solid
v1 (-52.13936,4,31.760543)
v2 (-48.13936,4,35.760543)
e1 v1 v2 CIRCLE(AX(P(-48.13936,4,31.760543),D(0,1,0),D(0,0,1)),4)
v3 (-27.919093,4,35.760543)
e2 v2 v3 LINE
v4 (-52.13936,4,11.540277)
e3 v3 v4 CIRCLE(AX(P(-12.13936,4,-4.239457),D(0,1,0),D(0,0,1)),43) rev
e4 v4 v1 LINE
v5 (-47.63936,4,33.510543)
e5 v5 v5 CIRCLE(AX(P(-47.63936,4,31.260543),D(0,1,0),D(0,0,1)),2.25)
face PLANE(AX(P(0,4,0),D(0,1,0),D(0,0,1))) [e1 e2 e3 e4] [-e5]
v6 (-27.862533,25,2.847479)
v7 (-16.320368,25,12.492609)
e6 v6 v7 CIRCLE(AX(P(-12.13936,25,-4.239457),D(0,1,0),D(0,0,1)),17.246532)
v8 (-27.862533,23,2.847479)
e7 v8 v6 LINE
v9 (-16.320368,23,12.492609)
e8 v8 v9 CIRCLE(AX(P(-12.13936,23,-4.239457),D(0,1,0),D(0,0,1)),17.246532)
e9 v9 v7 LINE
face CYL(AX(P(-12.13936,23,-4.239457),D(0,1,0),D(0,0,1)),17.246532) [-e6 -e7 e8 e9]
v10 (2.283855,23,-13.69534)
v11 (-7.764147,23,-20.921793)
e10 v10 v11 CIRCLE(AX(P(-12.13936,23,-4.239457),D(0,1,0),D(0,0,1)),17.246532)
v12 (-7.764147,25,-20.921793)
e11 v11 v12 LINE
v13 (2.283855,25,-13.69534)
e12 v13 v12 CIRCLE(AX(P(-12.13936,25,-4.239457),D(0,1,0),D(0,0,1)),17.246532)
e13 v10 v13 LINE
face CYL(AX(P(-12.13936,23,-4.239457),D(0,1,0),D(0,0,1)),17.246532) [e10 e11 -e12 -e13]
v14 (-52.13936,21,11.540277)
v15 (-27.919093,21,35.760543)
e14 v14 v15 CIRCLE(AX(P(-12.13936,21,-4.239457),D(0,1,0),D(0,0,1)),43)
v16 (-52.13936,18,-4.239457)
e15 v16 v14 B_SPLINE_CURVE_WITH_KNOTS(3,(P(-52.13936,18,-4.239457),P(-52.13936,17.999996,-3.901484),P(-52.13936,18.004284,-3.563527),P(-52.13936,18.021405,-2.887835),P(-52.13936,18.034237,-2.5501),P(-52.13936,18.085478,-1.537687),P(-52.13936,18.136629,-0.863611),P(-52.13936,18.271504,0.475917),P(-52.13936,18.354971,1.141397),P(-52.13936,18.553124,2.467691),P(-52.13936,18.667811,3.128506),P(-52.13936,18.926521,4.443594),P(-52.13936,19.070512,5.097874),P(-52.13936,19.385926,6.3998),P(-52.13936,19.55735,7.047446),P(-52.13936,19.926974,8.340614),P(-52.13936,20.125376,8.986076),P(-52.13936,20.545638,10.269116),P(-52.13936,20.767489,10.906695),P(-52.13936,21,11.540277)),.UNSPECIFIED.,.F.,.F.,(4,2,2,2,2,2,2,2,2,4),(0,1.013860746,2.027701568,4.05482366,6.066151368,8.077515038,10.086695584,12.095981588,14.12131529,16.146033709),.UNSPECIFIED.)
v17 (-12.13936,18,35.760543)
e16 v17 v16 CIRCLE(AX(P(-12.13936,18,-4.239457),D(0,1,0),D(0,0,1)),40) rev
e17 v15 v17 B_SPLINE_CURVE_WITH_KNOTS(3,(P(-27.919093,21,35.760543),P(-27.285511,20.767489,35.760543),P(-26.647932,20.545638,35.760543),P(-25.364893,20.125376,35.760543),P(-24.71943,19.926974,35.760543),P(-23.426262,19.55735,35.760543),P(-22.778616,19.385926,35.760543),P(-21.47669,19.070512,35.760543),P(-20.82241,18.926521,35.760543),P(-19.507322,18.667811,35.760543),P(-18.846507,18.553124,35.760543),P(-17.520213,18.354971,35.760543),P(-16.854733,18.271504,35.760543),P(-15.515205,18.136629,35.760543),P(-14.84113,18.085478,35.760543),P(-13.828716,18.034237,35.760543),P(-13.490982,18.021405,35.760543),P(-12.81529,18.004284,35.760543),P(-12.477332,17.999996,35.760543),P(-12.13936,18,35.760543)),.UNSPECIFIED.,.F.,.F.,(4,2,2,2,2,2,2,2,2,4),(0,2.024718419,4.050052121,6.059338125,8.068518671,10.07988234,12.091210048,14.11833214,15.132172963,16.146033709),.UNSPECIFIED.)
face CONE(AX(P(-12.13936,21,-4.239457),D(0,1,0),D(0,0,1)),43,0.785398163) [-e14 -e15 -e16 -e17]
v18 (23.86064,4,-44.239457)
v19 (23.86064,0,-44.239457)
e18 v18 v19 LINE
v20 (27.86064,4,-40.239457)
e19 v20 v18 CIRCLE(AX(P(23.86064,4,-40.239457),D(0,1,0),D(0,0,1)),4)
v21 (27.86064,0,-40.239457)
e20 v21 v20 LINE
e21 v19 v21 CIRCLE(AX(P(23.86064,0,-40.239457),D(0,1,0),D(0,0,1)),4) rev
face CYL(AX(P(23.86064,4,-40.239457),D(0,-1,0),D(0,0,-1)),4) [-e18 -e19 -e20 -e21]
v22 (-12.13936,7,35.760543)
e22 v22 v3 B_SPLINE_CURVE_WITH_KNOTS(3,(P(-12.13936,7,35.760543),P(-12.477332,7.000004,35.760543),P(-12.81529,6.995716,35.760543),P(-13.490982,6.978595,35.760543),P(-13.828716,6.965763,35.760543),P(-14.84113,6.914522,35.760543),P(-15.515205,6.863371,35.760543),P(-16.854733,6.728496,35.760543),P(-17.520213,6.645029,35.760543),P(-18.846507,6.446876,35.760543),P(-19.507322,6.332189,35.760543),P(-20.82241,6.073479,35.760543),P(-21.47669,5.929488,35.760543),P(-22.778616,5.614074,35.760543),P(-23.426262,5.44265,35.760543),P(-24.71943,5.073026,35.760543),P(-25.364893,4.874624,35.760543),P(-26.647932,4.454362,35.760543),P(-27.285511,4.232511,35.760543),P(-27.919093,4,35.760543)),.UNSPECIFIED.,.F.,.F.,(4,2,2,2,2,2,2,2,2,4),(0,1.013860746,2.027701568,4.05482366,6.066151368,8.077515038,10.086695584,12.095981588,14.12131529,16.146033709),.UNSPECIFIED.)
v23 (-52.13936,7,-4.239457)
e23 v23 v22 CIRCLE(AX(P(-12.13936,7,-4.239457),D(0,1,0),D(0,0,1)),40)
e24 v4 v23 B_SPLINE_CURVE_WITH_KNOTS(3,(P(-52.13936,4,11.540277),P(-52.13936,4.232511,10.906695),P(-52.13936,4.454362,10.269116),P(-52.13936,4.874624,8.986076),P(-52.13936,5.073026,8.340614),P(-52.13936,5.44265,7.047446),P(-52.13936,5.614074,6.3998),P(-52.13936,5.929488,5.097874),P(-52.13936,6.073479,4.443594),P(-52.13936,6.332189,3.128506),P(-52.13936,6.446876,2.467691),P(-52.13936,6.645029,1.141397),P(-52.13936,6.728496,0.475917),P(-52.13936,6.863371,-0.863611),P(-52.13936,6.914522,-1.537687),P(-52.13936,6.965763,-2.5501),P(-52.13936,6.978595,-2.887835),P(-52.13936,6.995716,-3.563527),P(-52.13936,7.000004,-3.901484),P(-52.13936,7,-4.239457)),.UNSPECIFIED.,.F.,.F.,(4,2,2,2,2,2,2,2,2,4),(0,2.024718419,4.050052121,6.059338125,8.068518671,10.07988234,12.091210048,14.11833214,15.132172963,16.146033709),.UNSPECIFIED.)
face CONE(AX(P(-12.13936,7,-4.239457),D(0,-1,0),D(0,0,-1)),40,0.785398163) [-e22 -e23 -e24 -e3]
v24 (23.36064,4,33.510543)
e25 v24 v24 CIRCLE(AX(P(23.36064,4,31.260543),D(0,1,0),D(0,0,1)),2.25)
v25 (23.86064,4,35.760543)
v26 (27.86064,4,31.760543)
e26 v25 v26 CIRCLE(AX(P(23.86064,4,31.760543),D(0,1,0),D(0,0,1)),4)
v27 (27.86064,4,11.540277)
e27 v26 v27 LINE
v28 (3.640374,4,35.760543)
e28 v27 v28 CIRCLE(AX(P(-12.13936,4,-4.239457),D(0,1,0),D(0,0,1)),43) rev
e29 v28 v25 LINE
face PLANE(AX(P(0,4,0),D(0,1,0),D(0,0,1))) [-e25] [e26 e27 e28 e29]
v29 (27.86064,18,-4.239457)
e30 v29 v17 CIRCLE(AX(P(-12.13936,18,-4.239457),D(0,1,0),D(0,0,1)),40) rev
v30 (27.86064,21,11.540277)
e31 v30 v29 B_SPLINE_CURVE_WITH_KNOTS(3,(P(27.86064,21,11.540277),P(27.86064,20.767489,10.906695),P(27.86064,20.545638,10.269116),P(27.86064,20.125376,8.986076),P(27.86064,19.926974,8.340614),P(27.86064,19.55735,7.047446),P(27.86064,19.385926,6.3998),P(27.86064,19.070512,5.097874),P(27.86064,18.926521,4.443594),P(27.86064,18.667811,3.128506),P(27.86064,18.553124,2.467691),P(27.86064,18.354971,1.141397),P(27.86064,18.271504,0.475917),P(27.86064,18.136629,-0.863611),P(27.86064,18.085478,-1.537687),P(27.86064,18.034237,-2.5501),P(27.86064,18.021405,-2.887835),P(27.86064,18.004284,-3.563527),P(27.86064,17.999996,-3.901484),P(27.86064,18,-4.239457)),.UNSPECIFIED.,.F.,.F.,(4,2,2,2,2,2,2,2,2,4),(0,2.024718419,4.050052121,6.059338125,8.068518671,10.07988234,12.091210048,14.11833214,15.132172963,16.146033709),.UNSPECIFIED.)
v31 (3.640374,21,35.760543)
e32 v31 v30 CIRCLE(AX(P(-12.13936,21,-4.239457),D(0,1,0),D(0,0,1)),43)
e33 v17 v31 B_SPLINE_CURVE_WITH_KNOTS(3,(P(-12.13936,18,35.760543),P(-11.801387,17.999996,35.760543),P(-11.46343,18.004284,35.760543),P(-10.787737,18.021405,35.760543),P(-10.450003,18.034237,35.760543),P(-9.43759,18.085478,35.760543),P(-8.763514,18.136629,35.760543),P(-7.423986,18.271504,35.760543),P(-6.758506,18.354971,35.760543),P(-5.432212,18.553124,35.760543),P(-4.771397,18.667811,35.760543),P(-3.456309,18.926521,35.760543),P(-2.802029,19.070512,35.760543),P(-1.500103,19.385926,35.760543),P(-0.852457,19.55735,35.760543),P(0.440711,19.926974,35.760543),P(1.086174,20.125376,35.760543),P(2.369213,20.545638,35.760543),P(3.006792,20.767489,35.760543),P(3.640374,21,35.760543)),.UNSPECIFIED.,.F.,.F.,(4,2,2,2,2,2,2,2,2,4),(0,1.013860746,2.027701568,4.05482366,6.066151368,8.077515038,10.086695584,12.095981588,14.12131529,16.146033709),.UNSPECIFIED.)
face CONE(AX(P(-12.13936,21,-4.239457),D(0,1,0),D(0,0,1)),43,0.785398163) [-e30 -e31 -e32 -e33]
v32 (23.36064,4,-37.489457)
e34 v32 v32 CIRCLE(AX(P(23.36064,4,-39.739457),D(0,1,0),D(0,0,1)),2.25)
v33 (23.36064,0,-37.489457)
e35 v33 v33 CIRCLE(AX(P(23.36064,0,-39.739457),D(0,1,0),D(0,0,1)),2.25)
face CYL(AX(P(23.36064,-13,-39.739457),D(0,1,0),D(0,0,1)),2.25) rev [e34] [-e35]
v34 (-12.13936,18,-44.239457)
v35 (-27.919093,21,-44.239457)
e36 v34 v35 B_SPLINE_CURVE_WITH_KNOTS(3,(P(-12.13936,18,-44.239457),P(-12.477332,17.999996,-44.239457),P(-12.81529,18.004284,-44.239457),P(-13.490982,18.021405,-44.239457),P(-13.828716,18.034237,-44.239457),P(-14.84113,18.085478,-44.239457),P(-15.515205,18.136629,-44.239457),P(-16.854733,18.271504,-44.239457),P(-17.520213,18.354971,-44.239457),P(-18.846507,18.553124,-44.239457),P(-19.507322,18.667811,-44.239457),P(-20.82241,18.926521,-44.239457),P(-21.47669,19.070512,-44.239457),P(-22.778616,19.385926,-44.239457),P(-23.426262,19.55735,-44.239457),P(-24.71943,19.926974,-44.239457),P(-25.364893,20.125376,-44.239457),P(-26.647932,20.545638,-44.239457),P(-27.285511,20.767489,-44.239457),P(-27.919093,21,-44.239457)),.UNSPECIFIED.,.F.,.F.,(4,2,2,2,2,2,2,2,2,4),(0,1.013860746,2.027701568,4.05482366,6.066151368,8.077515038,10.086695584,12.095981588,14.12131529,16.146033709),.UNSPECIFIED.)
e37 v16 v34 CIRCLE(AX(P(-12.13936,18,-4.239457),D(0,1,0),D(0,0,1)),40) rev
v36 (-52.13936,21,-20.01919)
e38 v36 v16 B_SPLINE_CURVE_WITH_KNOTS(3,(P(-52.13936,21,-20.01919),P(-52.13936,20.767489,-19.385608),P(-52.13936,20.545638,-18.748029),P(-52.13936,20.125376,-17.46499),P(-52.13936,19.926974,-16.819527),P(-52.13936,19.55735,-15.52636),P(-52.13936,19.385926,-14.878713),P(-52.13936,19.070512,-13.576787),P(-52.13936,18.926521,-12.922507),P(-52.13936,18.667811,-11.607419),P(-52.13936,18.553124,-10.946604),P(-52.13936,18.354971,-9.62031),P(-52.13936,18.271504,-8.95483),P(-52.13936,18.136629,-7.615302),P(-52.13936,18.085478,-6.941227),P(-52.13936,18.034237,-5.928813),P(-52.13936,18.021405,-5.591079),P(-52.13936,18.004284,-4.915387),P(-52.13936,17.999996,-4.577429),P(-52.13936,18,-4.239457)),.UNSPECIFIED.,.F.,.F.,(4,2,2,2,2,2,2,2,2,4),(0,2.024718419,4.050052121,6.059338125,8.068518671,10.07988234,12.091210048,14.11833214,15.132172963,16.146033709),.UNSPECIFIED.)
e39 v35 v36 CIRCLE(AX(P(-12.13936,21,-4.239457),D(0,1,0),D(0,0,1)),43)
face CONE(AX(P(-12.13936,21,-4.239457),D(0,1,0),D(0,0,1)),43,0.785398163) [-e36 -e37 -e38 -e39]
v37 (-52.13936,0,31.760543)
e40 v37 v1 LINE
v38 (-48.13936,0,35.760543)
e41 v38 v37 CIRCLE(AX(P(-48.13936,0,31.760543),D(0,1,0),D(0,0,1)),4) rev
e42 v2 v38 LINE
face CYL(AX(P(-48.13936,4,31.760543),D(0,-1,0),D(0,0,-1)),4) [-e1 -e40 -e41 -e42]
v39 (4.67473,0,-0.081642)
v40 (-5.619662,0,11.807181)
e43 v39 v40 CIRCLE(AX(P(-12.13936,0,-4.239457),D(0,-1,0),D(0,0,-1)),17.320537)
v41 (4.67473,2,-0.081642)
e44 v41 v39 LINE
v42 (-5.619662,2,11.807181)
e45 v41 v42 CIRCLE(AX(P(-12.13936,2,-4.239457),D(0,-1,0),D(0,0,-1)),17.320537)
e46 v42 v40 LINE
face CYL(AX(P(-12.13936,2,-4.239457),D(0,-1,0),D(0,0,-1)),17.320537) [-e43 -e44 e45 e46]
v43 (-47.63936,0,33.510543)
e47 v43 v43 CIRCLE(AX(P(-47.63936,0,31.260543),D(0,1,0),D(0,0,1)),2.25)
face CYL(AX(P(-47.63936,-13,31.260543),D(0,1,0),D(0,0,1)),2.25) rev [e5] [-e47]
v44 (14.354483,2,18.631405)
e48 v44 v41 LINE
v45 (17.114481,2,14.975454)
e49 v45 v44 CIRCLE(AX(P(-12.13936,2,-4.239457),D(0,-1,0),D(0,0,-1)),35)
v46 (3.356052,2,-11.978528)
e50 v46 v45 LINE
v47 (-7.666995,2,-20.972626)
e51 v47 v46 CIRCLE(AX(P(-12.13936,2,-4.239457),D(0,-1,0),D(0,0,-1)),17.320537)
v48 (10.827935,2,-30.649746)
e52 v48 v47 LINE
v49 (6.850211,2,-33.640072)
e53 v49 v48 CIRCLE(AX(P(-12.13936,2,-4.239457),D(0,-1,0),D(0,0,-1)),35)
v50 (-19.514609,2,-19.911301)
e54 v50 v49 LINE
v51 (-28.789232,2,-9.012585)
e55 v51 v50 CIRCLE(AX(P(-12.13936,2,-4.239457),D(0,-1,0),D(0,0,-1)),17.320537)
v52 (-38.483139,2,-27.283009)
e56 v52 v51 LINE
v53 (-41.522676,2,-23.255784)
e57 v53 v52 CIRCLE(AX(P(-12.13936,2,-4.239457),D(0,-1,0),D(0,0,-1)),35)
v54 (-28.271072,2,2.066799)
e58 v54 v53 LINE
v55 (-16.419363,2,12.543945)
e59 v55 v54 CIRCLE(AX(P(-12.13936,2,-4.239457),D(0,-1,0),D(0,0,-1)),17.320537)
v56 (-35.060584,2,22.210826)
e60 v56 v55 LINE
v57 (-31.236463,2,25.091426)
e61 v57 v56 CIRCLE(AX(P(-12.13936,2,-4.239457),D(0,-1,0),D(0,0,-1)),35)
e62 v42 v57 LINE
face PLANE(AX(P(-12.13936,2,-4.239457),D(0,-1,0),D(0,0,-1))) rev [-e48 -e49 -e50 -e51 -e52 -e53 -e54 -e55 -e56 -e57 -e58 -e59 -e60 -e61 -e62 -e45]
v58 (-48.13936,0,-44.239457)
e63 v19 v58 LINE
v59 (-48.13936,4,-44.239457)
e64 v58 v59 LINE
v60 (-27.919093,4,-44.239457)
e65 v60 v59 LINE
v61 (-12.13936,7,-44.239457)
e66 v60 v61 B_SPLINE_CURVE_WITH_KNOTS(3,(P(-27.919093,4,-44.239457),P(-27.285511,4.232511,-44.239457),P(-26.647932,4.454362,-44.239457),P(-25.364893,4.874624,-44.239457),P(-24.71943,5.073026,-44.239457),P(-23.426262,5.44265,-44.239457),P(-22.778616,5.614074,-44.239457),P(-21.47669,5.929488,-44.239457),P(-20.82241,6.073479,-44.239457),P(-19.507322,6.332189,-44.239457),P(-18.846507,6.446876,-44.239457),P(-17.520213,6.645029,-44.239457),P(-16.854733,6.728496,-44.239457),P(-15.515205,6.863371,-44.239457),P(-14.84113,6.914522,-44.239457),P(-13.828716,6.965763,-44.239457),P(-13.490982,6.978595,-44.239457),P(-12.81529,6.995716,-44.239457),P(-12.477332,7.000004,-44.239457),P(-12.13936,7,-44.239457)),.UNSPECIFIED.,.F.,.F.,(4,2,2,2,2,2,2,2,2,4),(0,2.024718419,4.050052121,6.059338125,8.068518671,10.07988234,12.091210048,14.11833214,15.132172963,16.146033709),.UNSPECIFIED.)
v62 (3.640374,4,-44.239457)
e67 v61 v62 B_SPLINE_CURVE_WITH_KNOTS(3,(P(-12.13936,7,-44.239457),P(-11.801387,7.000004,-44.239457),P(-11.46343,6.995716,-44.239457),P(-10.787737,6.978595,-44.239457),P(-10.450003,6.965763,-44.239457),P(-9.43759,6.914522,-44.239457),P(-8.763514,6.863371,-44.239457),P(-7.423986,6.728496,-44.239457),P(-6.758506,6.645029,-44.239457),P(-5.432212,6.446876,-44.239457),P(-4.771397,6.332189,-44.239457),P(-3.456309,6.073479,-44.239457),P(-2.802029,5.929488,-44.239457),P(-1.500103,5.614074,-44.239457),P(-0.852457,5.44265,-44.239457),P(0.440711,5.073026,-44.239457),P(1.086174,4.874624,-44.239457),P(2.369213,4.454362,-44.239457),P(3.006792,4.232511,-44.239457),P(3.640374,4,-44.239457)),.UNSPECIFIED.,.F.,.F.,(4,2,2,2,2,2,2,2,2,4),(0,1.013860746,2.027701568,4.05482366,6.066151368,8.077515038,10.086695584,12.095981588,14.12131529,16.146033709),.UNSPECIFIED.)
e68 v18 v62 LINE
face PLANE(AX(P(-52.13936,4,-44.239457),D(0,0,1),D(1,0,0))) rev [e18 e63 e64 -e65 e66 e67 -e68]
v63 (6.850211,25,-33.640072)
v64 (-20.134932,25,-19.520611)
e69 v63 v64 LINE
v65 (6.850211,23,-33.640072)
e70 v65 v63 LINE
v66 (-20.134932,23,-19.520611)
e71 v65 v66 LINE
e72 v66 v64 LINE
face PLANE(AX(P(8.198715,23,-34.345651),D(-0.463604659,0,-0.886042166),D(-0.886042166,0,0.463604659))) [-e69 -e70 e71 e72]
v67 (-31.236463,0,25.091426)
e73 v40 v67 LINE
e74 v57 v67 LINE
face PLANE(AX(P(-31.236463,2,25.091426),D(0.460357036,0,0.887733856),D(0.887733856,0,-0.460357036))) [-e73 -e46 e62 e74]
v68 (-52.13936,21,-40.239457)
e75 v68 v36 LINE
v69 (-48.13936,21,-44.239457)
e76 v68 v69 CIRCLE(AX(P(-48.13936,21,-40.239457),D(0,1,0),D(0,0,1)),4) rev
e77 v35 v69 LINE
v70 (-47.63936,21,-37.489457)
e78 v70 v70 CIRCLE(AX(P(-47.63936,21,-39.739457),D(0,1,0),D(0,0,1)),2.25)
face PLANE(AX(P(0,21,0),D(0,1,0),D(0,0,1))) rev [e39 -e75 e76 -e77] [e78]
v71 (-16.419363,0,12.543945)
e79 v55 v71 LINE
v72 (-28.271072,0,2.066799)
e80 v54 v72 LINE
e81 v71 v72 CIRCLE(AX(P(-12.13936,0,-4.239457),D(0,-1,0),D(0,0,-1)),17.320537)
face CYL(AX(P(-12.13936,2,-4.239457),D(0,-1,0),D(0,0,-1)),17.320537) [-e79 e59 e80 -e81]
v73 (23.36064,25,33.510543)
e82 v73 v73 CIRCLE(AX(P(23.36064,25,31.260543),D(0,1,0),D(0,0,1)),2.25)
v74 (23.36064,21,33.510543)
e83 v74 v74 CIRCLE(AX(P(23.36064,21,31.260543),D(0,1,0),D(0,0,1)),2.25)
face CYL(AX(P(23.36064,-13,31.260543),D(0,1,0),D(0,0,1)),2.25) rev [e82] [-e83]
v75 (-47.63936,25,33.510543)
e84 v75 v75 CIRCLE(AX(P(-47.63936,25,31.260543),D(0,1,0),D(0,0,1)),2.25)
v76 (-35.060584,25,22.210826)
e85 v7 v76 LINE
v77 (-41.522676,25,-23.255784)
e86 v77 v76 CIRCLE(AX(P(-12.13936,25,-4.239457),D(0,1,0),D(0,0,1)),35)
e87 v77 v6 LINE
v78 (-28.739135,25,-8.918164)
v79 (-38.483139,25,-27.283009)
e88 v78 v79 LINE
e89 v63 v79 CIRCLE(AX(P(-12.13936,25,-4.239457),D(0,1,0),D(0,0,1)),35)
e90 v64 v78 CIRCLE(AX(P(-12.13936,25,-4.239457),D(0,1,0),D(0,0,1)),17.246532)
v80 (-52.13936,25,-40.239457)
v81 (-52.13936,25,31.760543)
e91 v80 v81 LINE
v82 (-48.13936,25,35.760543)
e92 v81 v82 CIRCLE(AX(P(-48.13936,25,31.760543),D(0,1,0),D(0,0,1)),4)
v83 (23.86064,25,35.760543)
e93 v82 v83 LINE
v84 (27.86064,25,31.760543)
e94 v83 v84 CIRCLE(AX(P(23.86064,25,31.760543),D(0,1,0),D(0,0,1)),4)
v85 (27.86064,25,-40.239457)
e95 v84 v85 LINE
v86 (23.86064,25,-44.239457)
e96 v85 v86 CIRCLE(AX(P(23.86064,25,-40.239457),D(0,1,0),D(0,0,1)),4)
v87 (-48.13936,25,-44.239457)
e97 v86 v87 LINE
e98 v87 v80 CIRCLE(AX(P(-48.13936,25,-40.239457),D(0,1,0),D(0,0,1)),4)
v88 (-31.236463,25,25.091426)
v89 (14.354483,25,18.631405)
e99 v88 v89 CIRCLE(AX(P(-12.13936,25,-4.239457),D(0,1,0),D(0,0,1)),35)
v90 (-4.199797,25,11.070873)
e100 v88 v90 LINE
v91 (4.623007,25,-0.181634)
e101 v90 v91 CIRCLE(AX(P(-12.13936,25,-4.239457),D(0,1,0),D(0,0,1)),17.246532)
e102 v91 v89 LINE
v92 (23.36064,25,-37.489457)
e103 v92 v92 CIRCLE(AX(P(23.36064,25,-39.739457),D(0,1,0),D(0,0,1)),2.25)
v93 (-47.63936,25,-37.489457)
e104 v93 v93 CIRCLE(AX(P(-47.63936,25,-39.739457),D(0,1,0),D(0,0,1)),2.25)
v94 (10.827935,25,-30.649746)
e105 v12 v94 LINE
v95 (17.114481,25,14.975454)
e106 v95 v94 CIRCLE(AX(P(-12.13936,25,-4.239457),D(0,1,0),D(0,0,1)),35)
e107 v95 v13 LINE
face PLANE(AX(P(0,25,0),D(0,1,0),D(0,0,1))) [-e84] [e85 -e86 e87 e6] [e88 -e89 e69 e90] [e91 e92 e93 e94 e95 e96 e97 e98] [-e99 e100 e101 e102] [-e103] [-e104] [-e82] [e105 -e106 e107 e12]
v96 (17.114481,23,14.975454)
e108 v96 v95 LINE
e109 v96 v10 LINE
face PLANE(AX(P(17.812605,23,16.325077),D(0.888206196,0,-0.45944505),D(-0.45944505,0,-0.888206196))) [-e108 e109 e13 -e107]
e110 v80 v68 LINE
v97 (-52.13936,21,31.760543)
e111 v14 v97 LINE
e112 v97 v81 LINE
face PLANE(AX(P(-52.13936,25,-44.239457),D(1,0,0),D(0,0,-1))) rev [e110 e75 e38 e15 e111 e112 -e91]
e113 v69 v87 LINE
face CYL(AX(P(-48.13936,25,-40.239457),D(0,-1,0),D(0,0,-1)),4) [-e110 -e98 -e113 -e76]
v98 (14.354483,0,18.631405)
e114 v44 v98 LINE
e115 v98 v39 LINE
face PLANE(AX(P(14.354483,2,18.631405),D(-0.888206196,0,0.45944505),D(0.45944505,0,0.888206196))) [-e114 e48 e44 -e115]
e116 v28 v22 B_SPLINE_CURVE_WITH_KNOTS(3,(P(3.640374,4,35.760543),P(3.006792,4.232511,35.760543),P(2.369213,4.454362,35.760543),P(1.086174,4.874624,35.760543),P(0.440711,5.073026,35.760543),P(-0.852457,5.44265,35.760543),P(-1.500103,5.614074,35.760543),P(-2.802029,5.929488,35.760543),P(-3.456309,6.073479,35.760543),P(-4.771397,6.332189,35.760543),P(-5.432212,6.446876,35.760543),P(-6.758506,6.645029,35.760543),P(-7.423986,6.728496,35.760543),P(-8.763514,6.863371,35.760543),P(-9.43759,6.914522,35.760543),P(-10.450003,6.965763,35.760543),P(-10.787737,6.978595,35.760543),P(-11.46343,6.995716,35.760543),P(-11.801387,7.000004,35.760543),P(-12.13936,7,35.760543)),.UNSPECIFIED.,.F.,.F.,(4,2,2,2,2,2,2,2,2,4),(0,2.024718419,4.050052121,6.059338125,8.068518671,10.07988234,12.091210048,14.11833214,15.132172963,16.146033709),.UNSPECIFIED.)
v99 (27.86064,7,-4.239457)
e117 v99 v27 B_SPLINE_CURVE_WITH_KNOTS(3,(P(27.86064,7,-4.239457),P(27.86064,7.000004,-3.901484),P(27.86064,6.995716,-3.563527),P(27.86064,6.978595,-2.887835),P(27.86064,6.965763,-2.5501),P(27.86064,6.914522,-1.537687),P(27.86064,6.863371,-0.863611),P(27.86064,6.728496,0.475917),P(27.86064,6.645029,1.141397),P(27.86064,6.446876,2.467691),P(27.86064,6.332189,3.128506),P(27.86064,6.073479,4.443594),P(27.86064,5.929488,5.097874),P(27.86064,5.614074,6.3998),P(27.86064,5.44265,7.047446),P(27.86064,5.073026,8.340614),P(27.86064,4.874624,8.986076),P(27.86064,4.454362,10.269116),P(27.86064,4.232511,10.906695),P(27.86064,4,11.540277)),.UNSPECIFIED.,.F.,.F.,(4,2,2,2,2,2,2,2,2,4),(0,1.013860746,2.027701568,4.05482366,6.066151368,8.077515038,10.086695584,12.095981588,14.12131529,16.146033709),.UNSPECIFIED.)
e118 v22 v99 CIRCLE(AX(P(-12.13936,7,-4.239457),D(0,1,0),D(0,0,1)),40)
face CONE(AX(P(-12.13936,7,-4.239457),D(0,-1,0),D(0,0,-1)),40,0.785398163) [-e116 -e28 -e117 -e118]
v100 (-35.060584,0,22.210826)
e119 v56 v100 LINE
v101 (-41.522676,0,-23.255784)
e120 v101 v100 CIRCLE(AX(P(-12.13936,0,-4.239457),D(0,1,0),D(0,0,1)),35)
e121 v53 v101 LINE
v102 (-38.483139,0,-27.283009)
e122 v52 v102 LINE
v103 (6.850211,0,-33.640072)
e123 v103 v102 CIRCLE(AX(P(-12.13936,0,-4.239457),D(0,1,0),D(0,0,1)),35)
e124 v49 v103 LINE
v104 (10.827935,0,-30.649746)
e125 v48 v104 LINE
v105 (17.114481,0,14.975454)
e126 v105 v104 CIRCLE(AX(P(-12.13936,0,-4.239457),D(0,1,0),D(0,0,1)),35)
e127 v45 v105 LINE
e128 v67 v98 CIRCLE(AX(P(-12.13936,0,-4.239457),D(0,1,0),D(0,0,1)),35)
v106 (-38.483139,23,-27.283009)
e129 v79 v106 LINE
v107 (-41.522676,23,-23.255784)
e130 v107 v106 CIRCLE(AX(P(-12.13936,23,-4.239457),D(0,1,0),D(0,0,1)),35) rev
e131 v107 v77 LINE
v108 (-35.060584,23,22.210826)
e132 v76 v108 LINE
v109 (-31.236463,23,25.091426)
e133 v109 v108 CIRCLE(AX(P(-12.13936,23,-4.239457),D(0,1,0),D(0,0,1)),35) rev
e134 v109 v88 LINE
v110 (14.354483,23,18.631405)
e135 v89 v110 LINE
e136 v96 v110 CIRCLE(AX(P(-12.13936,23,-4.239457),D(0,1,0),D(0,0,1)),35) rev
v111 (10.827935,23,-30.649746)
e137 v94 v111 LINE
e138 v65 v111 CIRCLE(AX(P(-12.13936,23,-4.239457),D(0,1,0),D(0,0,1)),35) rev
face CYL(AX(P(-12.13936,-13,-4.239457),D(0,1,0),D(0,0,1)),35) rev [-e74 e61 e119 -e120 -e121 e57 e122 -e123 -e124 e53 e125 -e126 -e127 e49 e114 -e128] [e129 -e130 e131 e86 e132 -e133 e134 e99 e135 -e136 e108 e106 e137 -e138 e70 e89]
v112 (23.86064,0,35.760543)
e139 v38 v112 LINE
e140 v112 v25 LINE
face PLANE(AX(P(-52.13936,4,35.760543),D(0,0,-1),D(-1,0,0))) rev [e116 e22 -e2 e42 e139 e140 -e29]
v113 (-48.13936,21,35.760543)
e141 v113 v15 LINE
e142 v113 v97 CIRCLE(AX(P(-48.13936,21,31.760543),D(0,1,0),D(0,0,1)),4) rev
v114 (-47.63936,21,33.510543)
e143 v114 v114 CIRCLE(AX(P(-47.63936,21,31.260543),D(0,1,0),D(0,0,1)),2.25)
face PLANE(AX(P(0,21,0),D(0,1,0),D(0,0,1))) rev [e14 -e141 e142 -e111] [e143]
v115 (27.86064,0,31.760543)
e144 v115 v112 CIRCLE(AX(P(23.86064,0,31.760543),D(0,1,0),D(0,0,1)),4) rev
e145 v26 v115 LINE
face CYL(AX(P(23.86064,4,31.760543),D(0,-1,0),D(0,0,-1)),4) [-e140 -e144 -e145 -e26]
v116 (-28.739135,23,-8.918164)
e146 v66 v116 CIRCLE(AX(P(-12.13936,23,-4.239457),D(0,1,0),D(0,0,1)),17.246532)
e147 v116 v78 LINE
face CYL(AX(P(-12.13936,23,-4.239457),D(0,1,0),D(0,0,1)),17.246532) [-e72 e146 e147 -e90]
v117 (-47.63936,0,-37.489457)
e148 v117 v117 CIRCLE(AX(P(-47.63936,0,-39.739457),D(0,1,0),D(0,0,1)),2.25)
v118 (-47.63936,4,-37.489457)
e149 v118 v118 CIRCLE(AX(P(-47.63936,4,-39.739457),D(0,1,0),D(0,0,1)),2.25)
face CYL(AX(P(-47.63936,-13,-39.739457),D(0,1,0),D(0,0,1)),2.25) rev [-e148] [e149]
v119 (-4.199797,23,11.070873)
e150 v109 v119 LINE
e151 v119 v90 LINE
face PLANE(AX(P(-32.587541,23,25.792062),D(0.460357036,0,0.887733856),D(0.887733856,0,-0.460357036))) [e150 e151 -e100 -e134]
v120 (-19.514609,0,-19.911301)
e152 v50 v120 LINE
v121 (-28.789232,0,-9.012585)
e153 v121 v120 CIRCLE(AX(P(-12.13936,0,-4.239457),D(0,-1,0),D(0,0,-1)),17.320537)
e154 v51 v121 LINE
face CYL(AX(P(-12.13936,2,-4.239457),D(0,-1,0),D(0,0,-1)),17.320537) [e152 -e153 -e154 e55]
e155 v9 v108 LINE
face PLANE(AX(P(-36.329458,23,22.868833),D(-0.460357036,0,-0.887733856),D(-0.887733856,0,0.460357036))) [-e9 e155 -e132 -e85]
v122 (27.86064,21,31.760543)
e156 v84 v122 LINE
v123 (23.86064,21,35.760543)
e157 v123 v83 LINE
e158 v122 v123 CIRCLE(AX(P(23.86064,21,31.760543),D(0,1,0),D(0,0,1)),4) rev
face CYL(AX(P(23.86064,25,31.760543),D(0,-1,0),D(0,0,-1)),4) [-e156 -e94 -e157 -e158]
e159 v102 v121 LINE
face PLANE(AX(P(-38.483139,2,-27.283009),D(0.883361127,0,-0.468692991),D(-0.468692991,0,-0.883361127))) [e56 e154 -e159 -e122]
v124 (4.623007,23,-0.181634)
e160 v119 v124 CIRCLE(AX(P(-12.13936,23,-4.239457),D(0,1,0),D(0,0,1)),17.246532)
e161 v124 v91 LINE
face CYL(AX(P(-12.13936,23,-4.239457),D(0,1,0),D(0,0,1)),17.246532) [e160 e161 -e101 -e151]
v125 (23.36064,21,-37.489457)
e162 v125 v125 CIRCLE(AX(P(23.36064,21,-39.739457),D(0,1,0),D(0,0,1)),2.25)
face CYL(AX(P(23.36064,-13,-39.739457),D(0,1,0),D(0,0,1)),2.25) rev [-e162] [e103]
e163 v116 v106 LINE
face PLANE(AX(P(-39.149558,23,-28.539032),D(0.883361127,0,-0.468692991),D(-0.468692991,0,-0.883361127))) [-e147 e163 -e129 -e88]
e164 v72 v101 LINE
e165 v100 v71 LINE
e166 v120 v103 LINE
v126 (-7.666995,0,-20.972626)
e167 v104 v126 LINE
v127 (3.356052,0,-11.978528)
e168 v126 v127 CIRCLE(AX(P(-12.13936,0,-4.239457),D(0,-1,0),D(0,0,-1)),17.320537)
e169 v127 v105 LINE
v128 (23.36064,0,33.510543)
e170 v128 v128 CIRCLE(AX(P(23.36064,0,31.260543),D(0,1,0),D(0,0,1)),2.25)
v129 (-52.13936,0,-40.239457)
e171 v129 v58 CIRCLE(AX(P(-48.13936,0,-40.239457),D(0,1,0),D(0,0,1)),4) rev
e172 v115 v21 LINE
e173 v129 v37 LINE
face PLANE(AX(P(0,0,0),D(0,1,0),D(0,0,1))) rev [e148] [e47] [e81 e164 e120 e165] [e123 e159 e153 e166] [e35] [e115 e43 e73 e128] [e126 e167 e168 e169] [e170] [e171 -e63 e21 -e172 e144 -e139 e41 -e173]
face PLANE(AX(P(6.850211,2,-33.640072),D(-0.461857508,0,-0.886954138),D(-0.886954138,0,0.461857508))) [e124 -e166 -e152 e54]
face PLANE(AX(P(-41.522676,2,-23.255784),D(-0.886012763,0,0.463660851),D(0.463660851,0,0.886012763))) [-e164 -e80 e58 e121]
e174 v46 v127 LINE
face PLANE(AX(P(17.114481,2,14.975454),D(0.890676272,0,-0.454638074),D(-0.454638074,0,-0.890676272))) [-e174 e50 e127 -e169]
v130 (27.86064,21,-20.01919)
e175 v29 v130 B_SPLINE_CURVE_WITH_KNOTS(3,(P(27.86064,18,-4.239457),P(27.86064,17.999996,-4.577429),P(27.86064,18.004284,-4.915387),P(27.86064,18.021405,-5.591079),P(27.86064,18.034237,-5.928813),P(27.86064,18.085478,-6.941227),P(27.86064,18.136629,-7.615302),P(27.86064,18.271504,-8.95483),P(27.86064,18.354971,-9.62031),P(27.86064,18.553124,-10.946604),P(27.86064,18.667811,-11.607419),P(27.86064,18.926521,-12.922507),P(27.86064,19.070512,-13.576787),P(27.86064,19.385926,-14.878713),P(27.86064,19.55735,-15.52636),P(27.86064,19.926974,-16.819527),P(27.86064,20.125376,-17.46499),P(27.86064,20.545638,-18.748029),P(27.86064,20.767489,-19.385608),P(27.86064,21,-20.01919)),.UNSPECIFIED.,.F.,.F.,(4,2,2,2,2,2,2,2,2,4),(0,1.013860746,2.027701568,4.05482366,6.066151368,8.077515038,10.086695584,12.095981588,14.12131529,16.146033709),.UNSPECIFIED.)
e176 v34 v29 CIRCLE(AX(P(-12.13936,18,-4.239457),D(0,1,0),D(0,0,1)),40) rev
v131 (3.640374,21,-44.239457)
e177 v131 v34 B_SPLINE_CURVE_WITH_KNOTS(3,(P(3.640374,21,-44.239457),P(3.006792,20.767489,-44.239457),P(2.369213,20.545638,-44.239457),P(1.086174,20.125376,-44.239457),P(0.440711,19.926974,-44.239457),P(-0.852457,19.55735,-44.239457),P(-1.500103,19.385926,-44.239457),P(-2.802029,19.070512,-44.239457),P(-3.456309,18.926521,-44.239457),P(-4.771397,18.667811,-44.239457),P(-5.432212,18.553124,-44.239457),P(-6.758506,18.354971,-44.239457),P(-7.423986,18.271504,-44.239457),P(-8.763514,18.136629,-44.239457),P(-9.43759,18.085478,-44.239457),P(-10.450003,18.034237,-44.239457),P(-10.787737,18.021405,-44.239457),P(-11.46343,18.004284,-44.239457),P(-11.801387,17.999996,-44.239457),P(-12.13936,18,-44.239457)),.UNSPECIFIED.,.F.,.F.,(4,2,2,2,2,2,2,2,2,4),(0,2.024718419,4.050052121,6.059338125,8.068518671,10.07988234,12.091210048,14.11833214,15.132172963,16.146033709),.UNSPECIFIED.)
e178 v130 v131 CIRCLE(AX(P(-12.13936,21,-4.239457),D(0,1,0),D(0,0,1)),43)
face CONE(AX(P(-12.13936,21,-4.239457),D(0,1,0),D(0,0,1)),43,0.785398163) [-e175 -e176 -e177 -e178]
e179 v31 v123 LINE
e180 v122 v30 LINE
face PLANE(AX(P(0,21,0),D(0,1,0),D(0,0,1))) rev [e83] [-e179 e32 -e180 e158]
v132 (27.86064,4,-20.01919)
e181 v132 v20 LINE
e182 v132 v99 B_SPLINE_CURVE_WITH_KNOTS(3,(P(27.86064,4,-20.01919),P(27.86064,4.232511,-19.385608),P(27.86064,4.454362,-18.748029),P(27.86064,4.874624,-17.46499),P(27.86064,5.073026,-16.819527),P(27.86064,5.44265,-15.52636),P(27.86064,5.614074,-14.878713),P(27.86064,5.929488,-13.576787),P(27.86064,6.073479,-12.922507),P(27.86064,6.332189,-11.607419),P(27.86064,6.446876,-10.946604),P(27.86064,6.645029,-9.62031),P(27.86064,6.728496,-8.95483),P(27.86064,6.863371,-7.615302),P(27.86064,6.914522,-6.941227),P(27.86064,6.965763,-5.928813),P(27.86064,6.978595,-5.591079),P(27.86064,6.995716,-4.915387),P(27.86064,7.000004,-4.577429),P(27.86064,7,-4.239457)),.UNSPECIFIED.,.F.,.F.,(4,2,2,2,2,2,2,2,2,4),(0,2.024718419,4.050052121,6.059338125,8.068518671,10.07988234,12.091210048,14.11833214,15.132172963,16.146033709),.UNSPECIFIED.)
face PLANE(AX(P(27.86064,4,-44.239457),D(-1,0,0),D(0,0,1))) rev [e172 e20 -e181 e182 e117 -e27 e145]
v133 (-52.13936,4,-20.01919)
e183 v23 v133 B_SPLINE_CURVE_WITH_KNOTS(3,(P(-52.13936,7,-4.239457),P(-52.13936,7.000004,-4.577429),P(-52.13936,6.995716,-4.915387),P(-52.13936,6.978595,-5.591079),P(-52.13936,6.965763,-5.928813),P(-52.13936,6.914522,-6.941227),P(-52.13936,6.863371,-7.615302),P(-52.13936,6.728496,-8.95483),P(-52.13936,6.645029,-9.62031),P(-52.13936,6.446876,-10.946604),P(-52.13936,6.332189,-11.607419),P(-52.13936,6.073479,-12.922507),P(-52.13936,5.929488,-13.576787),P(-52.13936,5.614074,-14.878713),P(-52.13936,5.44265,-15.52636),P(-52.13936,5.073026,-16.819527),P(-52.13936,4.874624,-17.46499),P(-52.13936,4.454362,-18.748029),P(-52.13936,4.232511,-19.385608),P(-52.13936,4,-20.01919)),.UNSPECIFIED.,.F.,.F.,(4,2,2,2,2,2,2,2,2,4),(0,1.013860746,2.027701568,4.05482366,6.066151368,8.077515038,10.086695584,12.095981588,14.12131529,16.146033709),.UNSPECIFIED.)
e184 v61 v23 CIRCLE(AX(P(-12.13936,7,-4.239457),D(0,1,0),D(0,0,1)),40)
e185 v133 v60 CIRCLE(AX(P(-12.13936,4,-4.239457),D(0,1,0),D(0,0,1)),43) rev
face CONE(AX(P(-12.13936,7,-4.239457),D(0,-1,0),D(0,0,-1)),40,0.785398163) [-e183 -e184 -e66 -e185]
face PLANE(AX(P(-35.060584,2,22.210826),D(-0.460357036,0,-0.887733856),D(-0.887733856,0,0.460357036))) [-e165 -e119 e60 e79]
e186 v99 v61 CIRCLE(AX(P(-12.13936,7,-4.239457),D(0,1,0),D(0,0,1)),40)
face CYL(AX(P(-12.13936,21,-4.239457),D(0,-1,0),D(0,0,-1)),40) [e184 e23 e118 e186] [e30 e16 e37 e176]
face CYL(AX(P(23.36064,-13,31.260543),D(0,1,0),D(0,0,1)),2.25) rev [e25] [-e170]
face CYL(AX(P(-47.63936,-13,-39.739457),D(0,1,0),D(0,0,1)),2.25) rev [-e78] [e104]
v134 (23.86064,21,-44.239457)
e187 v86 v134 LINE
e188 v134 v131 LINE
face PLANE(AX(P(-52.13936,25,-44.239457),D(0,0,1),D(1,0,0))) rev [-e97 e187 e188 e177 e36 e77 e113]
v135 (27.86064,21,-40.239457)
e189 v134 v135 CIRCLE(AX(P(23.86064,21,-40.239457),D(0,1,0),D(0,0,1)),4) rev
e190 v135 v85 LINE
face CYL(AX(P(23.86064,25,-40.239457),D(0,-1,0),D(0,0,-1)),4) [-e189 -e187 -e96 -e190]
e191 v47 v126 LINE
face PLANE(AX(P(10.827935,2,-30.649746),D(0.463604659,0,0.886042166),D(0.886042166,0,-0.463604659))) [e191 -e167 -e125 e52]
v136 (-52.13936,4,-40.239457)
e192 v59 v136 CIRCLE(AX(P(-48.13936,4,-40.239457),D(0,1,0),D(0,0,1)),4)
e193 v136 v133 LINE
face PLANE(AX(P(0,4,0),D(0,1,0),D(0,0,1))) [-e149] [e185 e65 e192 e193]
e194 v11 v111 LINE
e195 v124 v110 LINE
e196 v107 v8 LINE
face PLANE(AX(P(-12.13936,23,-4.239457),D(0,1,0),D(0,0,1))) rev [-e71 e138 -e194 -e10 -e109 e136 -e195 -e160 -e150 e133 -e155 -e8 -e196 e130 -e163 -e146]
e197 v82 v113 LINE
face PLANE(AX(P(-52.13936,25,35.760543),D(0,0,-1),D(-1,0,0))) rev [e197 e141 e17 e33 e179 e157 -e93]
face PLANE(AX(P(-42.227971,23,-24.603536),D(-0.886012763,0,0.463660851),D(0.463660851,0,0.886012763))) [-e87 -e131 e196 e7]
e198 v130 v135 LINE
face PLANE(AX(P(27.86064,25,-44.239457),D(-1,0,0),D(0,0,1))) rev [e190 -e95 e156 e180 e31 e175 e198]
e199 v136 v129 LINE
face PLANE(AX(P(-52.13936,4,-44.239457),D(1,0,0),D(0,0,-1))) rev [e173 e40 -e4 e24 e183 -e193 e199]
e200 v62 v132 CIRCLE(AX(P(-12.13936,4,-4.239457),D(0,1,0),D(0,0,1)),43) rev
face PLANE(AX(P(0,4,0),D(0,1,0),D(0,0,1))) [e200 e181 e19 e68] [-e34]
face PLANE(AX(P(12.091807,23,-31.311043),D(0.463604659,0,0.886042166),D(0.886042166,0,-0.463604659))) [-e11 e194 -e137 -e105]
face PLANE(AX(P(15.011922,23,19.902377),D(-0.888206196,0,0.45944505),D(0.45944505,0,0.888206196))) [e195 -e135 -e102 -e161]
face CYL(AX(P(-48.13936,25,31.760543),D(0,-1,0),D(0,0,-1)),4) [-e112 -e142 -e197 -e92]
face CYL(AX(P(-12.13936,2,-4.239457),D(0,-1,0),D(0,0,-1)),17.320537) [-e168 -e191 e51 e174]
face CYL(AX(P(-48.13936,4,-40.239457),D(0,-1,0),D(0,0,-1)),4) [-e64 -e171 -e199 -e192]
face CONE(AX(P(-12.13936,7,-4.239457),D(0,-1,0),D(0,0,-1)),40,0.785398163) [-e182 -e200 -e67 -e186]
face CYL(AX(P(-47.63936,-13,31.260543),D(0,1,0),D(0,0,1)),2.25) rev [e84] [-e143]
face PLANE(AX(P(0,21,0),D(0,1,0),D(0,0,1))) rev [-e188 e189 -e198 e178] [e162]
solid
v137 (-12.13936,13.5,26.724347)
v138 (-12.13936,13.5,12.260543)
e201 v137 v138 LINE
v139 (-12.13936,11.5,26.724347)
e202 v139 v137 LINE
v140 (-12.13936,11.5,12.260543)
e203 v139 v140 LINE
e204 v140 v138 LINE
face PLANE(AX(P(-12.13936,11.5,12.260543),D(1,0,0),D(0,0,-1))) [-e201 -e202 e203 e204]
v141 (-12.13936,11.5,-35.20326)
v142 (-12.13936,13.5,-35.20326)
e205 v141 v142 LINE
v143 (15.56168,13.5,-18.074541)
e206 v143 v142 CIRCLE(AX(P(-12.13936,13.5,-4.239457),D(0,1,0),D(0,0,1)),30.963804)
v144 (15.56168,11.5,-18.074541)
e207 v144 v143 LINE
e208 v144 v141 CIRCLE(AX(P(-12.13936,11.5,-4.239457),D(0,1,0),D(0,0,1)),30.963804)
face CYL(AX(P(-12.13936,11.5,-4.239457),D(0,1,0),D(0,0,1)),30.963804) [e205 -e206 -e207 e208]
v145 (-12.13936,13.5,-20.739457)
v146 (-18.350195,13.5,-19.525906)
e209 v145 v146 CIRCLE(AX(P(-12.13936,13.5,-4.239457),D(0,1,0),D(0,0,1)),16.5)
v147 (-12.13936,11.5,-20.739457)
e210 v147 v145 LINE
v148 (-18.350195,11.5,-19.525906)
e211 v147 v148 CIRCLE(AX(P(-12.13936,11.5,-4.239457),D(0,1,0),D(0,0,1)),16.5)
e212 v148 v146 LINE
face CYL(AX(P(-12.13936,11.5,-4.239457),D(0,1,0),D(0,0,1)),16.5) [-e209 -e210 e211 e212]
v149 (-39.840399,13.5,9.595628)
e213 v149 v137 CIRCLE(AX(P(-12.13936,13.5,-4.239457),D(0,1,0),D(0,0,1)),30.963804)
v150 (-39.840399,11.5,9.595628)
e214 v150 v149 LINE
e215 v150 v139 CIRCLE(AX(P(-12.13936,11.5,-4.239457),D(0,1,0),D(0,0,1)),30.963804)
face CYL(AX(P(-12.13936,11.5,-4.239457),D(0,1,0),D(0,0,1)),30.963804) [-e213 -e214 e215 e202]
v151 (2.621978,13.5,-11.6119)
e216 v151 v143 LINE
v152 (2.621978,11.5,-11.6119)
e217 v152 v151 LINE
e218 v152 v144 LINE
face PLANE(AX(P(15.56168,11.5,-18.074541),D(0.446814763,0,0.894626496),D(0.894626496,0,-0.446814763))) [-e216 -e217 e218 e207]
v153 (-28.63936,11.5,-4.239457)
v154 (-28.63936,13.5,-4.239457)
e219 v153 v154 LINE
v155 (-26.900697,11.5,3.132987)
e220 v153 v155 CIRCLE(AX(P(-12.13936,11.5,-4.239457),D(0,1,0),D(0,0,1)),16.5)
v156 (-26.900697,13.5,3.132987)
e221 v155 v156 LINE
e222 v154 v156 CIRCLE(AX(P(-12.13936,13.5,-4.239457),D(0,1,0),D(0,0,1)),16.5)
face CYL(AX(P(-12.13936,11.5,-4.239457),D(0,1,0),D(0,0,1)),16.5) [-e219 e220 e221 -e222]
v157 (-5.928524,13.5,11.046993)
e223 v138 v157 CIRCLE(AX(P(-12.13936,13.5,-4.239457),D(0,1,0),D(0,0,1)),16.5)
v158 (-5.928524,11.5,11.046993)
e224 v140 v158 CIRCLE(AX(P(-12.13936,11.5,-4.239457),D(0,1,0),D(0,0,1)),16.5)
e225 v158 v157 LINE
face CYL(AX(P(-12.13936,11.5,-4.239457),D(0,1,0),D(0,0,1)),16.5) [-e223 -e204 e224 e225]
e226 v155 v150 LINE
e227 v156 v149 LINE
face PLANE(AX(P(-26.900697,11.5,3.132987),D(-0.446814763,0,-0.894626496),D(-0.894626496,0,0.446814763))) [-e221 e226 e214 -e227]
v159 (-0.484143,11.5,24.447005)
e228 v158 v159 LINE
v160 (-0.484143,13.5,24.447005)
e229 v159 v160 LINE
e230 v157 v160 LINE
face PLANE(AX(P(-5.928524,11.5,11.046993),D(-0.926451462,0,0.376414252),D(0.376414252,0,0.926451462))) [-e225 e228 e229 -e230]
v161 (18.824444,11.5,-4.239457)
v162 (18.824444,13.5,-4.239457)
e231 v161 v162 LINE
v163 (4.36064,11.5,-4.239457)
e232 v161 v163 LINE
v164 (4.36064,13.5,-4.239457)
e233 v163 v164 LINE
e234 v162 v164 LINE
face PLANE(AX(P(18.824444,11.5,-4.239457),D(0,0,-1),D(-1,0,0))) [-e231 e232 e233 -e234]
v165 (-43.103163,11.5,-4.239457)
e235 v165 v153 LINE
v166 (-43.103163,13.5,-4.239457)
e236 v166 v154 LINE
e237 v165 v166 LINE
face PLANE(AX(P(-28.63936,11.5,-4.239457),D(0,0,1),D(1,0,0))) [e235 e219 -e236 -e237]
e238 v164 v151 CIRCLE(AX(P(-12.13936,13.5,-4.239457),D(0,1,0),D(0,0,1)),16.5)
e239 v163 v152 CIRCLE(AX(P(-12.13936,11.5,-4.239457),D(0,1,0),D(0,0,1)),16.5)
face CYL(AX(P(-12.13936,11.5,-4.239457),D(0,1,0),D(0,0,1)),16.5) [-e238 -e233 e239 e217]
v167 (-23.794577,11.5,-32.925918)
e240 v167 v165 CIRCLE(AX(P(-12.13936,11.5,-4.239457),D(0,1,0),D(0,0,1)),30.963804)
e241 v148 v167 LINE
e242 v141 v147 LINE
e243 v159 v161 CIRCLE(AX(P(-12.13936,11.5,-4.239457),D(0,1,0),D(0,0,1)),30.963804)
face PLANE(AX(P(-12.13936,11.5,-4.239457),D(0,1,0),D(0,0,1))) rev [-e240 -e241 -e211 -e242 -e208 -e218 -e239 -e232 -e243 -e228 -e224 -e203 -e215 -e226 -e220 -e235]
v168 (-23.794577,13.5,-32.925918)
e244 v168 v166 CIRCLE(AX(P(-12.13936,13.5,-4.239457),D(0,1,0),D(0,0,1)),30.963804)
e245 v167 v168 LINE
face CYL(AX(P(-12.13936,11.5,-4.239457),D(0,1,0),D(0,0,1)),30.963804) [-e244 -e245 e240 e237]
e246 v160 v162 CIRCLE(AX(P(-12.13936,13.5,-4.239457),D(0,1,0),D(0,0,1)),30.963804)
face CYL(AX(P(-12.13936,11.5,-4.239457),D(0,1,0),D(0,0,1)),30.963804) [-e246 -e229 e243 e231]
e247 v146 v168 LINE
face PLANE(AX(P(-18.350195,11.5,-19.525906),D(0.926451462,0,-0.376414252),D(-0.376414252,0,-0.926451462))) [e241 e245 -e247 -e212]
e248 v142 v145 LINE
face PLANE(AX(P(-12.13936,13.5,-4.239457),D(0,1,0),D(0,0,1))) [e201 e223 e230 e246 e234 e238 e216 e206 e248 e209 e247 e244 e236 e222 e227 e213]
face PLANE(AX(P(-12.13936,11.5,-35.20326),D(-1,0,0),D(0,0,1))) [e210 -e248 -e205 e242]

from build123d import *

# Parameters (mm, degrees)
SKETCH_1_W           = 80
SKETCH_1_H           = 80
EXTRUDE_1_DEPTH      = 4
SKETCH_3_R           = 40
EXTRUDE_2_DEPTH      = 17
SKETCH_4_W           = 80
SKETCH_4_H           = 80
EXTRUDE_3_DEPTH      = 4
SKETCH_5_R           = 35
CUT_EXTRUDE_2_DEPTH  = 38
SKETCH_6_R           = 2.25
CUT_EXTRUDE_3_DEPTH  = 38
FILLET_1_R           = 4
CHAMFER_3_SIZE       = 3
EXTRUDE_4_DEPTH      = 1
EXTRUDE_4_DEPTH_BACK = 1
EXTRUDE_5_DEPTH      = 2
EXTRUDE_START        = -2
EXTRUDE_6_DEPTH      = 2


with BuildPart() as part:
    # Эскиз1 → Бобышка-Вытянуть1 (new body)
    with BuildSketch(Plane(origin=(0, 0, 0), x_dir=(1, 0, 0), z_dir=(0, 1, 0))):
        with Locations((-12.139359553, 4.23945659)):
            Rectangle(SKETCH_1_W, SKETCH_1_H)
    extrude(amount=EXTRUDE_1_DEPTH)

    # Эскиз3 → Бобышка-Вытянуть2 (add)
    with BuildSketch(Plane(origin=(0, 4, 0), x_dir=(1, 0, 0), z_dir=(0, 1, 0))):
        with Locations(Location((-12.139359553, 4.23945659, 0), (0, 0, 270))):
            Circle(SKETCH_3_R)
    extrude(amount=EXTRUDE_2_DEPTH)

    # Эскиз4 → Бобышка-Вытянуть3 (add)
    with BuildSketch(Plane(origin=(0, 21, 0), x_dir=(1, 0, 0), z_dir=(0, 1, 0))):
        with Locations((-12.139359553, 4.23945659)):
            Rectangle(SKETCH_4_W, SKETCH_4_H)
    extrude(amount=EXTRUDE_3_DEPTH)

    # Эскиз5 → Вырез-Вытянуть2 (cut)
    with BuildSketch(Plane(origin=(0, 25, 0), x_dir=(1, 0, 0), z_dir=(0, 1, 0))):
        with Locations(Location((-12.139359553, 4.23945659, 0), (0, 0, 270))):
            Circle(SKETCH_5_R)
    extrude(amount=-CUT_EXTRUDE_2_DEPTH, mode=Mode.SUBTRACT)

    # Эскиз6 → Вырез-Вытянуть3 (cut)
    with BuildSketch(Plane(origin=(0, 25, 0), x_dir=(1, 0, 0), z_dir=(0, 1, 0))):
        with Locations(Location((-47.639359553, 39.73945659, 0), (0, 0, 270))):
            Circle(SKETCH_6_R)
        with Locations(Location((23.360640447, 39.73945659, 0), (0, 0, 270))):
            Circle(SKETCH_6_R)
        with Locations(Location((-47.639359553, -31.26054341, 0), (0, 0, 270))):
            Circle(SKETCH_6_R)
        with Locations(Location((23.360640447, -31.26054341, 0), (0, 0, 270))):
            Circle(SKETCH_6_R)
    extrude(amount=-CUT_EXTRUDE_3_DEPTH, mode=Mode.SUBTRACT)

    # Скругление1
    fillet_1_edges = [part.edges().sort_by_distance(p)[0] for p in [
        (-52.139359553, 23, -44.23945659),
        (-52.139359553, 23, 35.76054341),
        (27.860640447, 23, 35.76054341),
        (27.860640447, 23, -44.23945659),
        (-52.139359553, 2, -44.23945659),
        (27.860640447, 2, -44.23945659),
        (27.860640447, 2, 35.76054341),
        (-52.139359553, 2, 35.76054341),
    ]]
    fillet(fillet_1_edges, radius=FILLET_1_R)

    # Фаска3
    # the kernel refuses this chamfer: 3 mm, written as the material it adds along each edge
    with BuildSketch(Plane(origin=(-12.139359553, 4, -4.23945659), x_dir=(-1, 0, 0), z_dir=(0, 0, -1))) as chamfer_3_piece_1_section:
        Polygon((40, CHAMFER_3_SIZE), (40 + CHAMFER_3_SIZE, 0), (40, 0), align=None)
    chamfer_3_piece_1 = revolve(axis=Axis((-12.139359553, 4, -4.23945659), (0, 1, 0)), revolution_arc=90, mode=Mode.PRIVATE)
    chamfer_3_piece_1 = split(chamfer_3_piece_1, bisect_by=Plane(origin=(-52.139359553, 5.457700283, 25.075564413), z_dir=(1, 0, 0)), keep=Keep.TOP, mode=Mode.PRIVATE)
    chamfer_3_piece_1 = split(chamfer_3_piece_1, bisect_by=Plane(origin=(-41.454380555, 5.457700283, 35.76054341), z_dir=(0, 0, -1)), keep=Keep.TOP, mode=Mode.PRIVATE)
    add(chamfer_3_piece_1)
    with BuildSketch(Plane(origin=(-12.139359553, 4, -4.23945659), x_dir=(0, 0, -1), z_dir=(1, 0, 0))) as chamfer_3_piece_2_section:
        Polygon((40 + CHAMFER_3_SIZE, 0), (40, CHAMFER_3_SIZE), (40, 0), align=None)
    chamfer_3_piece_2 = revolve(axis=Axis((-12.139359553, 4, -4.23945659), (0, 1, 0)), revolution_arc=90, mode=Mode.PRIVATE)
    chamfer_3_piece_2 = split(chamfer_3_piece_2, bisect_by=Plane(origin=(-41.454380555, 5.457700283, -44.23945659), z_dir=(0, 0, 1)), keep=Keep.TOP, mode=Mode.PRIVATE)
    chamfer_3_piece_2 = split(chamfer_3_piece_2, bisect_by=Plane(origin=(-52.139359553, 5.457700283, -33.554477593), z_dir=(1, 0, 0)), keep=Keep.TOP, mode=Mode.PRIVATE)
    add(chamfer_3_piece_2)
    with BuildSketch(Plane(origin=(-12.139359553, 4, -4.23945659), x_dir=(1.0, 0, 8.787882221916732e-09), z_dir=(-8.787882221916732e-09, 0, 1.0))) as chamfer_3_piece_3_section:
        Polygon((40 + CHAMFER_3_SIZE, 0), (40, CHAMFER_3_SIZE), (40, 0), align=None)
    chamfer_3_piece_3 = revolve(axis=Axis((-12.139359553, 4, -4.23945659), (0, 1, 0)), revolution_arc=90.000000504, mode=Mode.PRIVATE)
    chamfer_3_piece_3 = split(chamfer_3_piece_3, bisect_by=Plane(origin=(17.175661571, 5.457700294, -44.23945659), z_dir=(0, 0, 1)), keep=Keep.TOP, mode=Mode.PRIVATE)
    chamfer_3_piece_3 = split(chamfer_3_piece_3, bisect_by=Plane(origin=(27.860640447, 5.457700294, -33.554477456), z_dir=(-1, 0, 0)), keep=Keep.TOP, mode=Mode.PRIVATE)
    add(chamfer_3_piece_3)
    with BuildSketch(Plane(origin=(-12.139359553, 4, -4.23945659), x_dir=(0, 0, 1), z_dir=(-1, 0, 0))) as chamfer_3_piece_4_section:
        Polygon((40, CHAMFER_3_SIZE), (40 + CHAMFER_3_SIZE, 0), (40, 0), align=None)
    chamfer_3_piece_4 = revolve(axis=Axis((-12.139359553, 4, -4.23945659), (0, 1, 0)), revolution_arc=89.999999496, mode=Mode.PRIVATE)
    chamfer_3_piece_4 = split(chamfer_3_piece_4, bisect_by=Plane(origin=(27.860640447, 5.457700283, 25.075564541), z_dir=(-1, 0, 0)), keep=Keep.TOP, mode=Mode.PRIVATE)
    chamfer_3_piece_4 = split(chamfer_3_piece_4, bisect_by=Plane(origin=(17.175661321, 5.457700283, 35.76054341), z_dir=(0, 0, -1)), keep=Keep.TOP, mode=Mode.PRIVATE)
    add(chamfer_3_piece_4)
    with BuildSketch(Plane(origin=(-12.139359553, 21, -4.23945659), x_dir=(0, 0, 1), z_dir=(-1, 0, 0))) as chamfer_3_piece_5_section:
        Polygon((40, -CHAMFER_3_SIZE), (40 + CHAMFER_3_SIZE, 0), (40, 0), align=None)
    chamfer_3_piece_5 = revolve(axis=Axis((-12.139359553, 21, -4.23945659), (0, 1, 0)), revolution_arc=90.000000093, mode=Mode.PRIVATE)
    chamfer_3_piece_5 = split(chamfer_3_piece_5, bisect_by=Plane(origin=(27.860640447, 19.542299715, 25.075564387), z_dir=(-1, 0, 0)), keep=Keep.TOP, mode=Mode.PRIVATE)
    chamfer_3_piece_5 = split(chamfer_3_piece_5, bisect_by=Plane(origin=(17.175661472, 19.542299715, 35.76054341), z_dir=(0, 0, -1)), keep=Keep.TOP, mode=Mode.PRIVATE)
    add(chamfer_3_piece_5)
    with BuildSketch(Plane(origin=(-12.139359553, 21, -4.23945659), x_dir=(1.0, 0, -1.6192726937092062e-09), z_dir=(1.6192726937092062e-09, 0, 1.0))) as chamfer_3_piece_6_section:
        Polygon((40, -CHAMFER_3_SIZE), (40 + CHAMFER_3_SIZE, 0), (40, 0), align=None)
    chamfer_3_piece_6 = revolve(axis=Axis((-12.139359553, 21, -4.23945659), (0, 1, 0)), revolution_arc=89.999999907, mode=Mode.PRIVATE)
    chamfer_3_piece_6 = split(chamfer_3_piece_6, bisect_by=Plane(origin=(17.175661426, 19.542299717, -44.23945659), z_dir=(0, 0, 1)), keep=Keep.TOP, mode=Mode.PRIVATE)
    chamfer_3_piece_6 = split(chamfer_3_piece_6, bisect_by=Plane(origin=(27.860640447, 19.542299717, -33.554477616), z_dir=(-1, 0, 0)), keep=Keep.TOP, mode=Mode.PRIVATE)
    add(chamfer_3_piece_6)
    with BuildSketch(Plane(origin=(-12.139359553, 21, -4.23945659), x_dir=(0, 0, -1), z_dir=(1, 0, 0))) as chamfer_3_piece_7_section:
        Polygon((40, -CHAMFER_3_SIZE), (40 + CHAMFER_3_SIZE, 0), (40, 0), align=None)
    chamfer_3_piece_7 = revolve(axis=Axis((-12.139359553, 21, -4.23945659), (0, 1, 0)), revolution_arc=90, mode=Mode.PRIVATE)
    chamfer_3_piece_7 = split(chamfer_3_piece_7, bisect_by=Plane(origin=(-41.454380555, 19.542299717, -44.23945659), z_dir=(0, 0, 1)), keep=Keep.TOP, mode=Mode.PRIVATE)
    chamfer_3_piece_7 = split(chamfer_3_piece_7, bisect_by=Plane(origin=(-52.139359553, 19.542299717, -33.554477593), z_dir=(1, 0, 0)), keep=Keep.TOP, mode=Mode.PRIVATE)
    add(chamfer_3_piece_7)
    with BuildSketch(Plane(origin=(-12.139359553, 21, -4.23945659), x_dir=(-1, 0, 0), z_dir=(0, 0, -1))) as chamfer_3_piece_8_section:
        Polygon((40, -CHAMFER_3_SIZE), (40 + CHAMFER_3_SIZE, 0), (40, 0), align=None)
    chamfer_3_piece_8 = revolve(axis=Axis((-12.139359553, 21, -4.23945659), (0, 1, 0)), revolution_arc=90, mode=Mode.PRIVATE)
    chamfer_3_piece_8 = split(chamfer_3_piece_8, bisect_by=Plane(origin=(-52.139359553, 19.542299717, 25.075564413), z_dir=(1, 0, 0)), keep=Keep.TOP, mode=Mode.PRIVATE)
    chamfer_3_piece_8 = split(chamfer_3_piece_8, bisect_by=Plane(origin=(-41.454380555, 19.542299717, 35.76054341), z_dir=(0, 0, -1)), keep=Keep.TOP, mode=Mode.PRIVATE)
    add(chamfer_3_piece_8)

    # Эскиз8 → Бобышка-Вытянуть5 (add)
    with BuildSketch(Plane(origin=(0, 25, 0), x_dir=(1, 0, 0), z_dir=(0, 1, 0))):
        with BuildLine():
            Line((8.198715257, 34.345651042), (-20.134931912, 19.520610741))
            ThreePointArc((-20.134931912, 19.520610741), (-25.530989427, 15.107165587), (-28.739134966, 8.918164292))
            Line((-28.739134966, 8.918164292), (-39.14955843, 28.539032471))
            ThreePointArc((-39.14955843, 28.539032471), (-40.756497042, 26.624265575), (-42.22797062, 24.603535637))
            Line((-42.22797062, 24.603535637), (-27.862533393, -2.84747885))
            ThreePointArc((-27.862533393, -2.84747885), (-23.198349305, -8.994650679), (-16.32036828, -12.4926089))
            Line((-16.32036828, -12.4926089), (-36.329458207, -22.868832889))
            ThreePointArc((-36.329458207, -22.868832889), (-34.506306833, -24.391643646), (-32.587541045, -25.792061936))
            Line((-32.587541045, -25.792061936), (-4.199797418, -11.070873343))
            ThreePointArc((-4.199797418, -11.070873343), (1.432709083, -6.402056577), (4.623006763, 0.181633892))
            Line((4.623006763, 0.181633892), (15.011922437, -19.902376764))
            ThreePointArc((15.011922437, -19.902376764), (16.468234928, -18.157546991), (17.812605081, -16.325077102))
            Line((17.812605081, -16.325077102), (2.283855016, 13.69534))
            ThreePointArc((2.283855016, 13.69534), (-2.069571834, 18.240964539), (-7.76414681, 20.921793447))
            Line((-7.76414681, 20.921793447), (12.091807498, 31.311042705))
            ThreePointArc((12.091807498, 31.311042705), (10.196856374, 32.894537979), (8.198715257, 34.345651042))
        make_face()
    extrude(amount=-EXTRUDE_5_DEPTH)

    # Эскиз9 → Бобышка-Вытянуть6 (add)
    with BuildSketch(Plane.XZ.offset(EXTRUDE_START)):
        with BuildLine():
            Line((-31.236462552, 25.091425719), (-5.619662436, 11.807180567))
            ThreePointArc((-5.619662436, 11.807180567), (0.954624714, 7.098470494), (4.674729653, -0.081642411))
            Line((4.674729653, -0.081642411), (14.354483046, 18.631404879))
            ThreePointArc((14.354483046, 18.631404879), (15.794357566, 16.848631231), (17.114481483, 14.975453887))
            Line((17.114481483, 14.975453887), (3.356052101, -11.978528384))
            ThreePointArc((3.356052101, -11.978528384), (-1.1894065, -17.65957368), (-7.666994922, -20.972626318))
            Line((-7.666994922, -20.972626318), (10.827935256, -30.649745668))
            ThreePointArc((10.827935256, -30.649745668), (8.892287068, -32.215693657), (6.850211416, -33.640072135))
            Line((6.850211416, -33.640072135), (-19.51460942, -19.911300895))
            ThreePointArc((-19.51460942, -19.911300895), (-25.3301569, -15.464601573), (-28.78923236, -9.0125845))
            Line((-28.78923236, -9.0125845), (-38.483138566, -27.283008992))
            ThreePointArc((-38.483138566, -27.283008992), (-40.075571458, -25.324239358), (-41.522676276, -23.255783742))
            Line((-41.522676276, -23.255783742), (-28.271072163, 2.066799257))
            ThreePointArc((-28.271072163, 2.066799257), (-23.611159336, 8.737400667), (-16.419363442, 12.543945367))
            Line((-16.419363442, 12.543945367), (-35.060584427, 22.210826022))
            ThreePointArc((-35.060584427, 22.210826022), (-33.197836064, 23.716590467), (-31.236462552, 25.091425719))
        make_face()
    extrude(amount=EXTRUDE_6_DEPTH)


with BuildPart() as body_2:
    # Эскиз7 → Бобышка-Вытянуть4 (new, two sides: drawn at the far end of the back side and taken through both)
    with BuildSketch(Plane(origin=(0, 12.5, 0), x_dir=(1, 0, 0), z_dir=(0, 1, 0)).offset(-EXTRUDE_4_DEPTH_BACK)):
        with BuildLine():
            Line((-12.139359553, 35.203260234), (-12.139359553, 20.73945659))
            ThreePointArc((-12.139359553, 20.73945659), (-15.303501581, 20.433227158), (-18.350194711, 19.525905708))
            Line((-18.350194711, 19.525905708), (-23.794576541, 32.925917735))
            ThreePointArc((-23.794576541, 32.925917735), (-37.826389221, 21.529154185), (-43.103163196, 4.23945659))
            Line((-43.103163196, 4.23945659), (-28.639359553, 4.23945659))
            ThreePointArc((-28.639359553, 4.23945659), (-28.198812588, 0.452113431), (-26.90069674, -3.132986996))
            Line((-26.90069674, -3.132986996), (-39.840398716, -9.595627991))
            ThreePointArc((-39.840398716, -9.595627991), (-28.423865896, -22.096298368), (-12.139359553, -26.724347054))
            Line((-12.139359553, -26.724347054), (-12.139359553, -12.26054341))
            ThreePointArc((-12.139359553, -12.26054341), (-8.975217524, -11.954313978), (-5.928524394, -11.046992528))
            Line((-5.928524394, -11.046992528), (-0.484142564, -24.447004555))
            ThreePointArc((-0.484142564, -24.447004555), (13.547670115, -13.050241005), (18.824444091, 4.23945659))
            Line((18.824444091, 4.23945659), (4.360640447, 4.23945659))
            ThreePointArc((4.360640447, 4.23945659), (3.920093483, 8.026799749), (2.621977635, 11.611900176))
            Line((2.621977635, 11.611900176), (15.561679611, 18.074541171))
            ThreePointArc((15.561679611, 18.074541171), (4.145146791, 30.575211548), (-12.139359553, 35.203260234))
        make_face()
    extrude(amount=EXTRUDE_4_DEPTH + EXTRUDE_4_DEPTH_BACK)


solid = Compound([part.part, body_2.part])
